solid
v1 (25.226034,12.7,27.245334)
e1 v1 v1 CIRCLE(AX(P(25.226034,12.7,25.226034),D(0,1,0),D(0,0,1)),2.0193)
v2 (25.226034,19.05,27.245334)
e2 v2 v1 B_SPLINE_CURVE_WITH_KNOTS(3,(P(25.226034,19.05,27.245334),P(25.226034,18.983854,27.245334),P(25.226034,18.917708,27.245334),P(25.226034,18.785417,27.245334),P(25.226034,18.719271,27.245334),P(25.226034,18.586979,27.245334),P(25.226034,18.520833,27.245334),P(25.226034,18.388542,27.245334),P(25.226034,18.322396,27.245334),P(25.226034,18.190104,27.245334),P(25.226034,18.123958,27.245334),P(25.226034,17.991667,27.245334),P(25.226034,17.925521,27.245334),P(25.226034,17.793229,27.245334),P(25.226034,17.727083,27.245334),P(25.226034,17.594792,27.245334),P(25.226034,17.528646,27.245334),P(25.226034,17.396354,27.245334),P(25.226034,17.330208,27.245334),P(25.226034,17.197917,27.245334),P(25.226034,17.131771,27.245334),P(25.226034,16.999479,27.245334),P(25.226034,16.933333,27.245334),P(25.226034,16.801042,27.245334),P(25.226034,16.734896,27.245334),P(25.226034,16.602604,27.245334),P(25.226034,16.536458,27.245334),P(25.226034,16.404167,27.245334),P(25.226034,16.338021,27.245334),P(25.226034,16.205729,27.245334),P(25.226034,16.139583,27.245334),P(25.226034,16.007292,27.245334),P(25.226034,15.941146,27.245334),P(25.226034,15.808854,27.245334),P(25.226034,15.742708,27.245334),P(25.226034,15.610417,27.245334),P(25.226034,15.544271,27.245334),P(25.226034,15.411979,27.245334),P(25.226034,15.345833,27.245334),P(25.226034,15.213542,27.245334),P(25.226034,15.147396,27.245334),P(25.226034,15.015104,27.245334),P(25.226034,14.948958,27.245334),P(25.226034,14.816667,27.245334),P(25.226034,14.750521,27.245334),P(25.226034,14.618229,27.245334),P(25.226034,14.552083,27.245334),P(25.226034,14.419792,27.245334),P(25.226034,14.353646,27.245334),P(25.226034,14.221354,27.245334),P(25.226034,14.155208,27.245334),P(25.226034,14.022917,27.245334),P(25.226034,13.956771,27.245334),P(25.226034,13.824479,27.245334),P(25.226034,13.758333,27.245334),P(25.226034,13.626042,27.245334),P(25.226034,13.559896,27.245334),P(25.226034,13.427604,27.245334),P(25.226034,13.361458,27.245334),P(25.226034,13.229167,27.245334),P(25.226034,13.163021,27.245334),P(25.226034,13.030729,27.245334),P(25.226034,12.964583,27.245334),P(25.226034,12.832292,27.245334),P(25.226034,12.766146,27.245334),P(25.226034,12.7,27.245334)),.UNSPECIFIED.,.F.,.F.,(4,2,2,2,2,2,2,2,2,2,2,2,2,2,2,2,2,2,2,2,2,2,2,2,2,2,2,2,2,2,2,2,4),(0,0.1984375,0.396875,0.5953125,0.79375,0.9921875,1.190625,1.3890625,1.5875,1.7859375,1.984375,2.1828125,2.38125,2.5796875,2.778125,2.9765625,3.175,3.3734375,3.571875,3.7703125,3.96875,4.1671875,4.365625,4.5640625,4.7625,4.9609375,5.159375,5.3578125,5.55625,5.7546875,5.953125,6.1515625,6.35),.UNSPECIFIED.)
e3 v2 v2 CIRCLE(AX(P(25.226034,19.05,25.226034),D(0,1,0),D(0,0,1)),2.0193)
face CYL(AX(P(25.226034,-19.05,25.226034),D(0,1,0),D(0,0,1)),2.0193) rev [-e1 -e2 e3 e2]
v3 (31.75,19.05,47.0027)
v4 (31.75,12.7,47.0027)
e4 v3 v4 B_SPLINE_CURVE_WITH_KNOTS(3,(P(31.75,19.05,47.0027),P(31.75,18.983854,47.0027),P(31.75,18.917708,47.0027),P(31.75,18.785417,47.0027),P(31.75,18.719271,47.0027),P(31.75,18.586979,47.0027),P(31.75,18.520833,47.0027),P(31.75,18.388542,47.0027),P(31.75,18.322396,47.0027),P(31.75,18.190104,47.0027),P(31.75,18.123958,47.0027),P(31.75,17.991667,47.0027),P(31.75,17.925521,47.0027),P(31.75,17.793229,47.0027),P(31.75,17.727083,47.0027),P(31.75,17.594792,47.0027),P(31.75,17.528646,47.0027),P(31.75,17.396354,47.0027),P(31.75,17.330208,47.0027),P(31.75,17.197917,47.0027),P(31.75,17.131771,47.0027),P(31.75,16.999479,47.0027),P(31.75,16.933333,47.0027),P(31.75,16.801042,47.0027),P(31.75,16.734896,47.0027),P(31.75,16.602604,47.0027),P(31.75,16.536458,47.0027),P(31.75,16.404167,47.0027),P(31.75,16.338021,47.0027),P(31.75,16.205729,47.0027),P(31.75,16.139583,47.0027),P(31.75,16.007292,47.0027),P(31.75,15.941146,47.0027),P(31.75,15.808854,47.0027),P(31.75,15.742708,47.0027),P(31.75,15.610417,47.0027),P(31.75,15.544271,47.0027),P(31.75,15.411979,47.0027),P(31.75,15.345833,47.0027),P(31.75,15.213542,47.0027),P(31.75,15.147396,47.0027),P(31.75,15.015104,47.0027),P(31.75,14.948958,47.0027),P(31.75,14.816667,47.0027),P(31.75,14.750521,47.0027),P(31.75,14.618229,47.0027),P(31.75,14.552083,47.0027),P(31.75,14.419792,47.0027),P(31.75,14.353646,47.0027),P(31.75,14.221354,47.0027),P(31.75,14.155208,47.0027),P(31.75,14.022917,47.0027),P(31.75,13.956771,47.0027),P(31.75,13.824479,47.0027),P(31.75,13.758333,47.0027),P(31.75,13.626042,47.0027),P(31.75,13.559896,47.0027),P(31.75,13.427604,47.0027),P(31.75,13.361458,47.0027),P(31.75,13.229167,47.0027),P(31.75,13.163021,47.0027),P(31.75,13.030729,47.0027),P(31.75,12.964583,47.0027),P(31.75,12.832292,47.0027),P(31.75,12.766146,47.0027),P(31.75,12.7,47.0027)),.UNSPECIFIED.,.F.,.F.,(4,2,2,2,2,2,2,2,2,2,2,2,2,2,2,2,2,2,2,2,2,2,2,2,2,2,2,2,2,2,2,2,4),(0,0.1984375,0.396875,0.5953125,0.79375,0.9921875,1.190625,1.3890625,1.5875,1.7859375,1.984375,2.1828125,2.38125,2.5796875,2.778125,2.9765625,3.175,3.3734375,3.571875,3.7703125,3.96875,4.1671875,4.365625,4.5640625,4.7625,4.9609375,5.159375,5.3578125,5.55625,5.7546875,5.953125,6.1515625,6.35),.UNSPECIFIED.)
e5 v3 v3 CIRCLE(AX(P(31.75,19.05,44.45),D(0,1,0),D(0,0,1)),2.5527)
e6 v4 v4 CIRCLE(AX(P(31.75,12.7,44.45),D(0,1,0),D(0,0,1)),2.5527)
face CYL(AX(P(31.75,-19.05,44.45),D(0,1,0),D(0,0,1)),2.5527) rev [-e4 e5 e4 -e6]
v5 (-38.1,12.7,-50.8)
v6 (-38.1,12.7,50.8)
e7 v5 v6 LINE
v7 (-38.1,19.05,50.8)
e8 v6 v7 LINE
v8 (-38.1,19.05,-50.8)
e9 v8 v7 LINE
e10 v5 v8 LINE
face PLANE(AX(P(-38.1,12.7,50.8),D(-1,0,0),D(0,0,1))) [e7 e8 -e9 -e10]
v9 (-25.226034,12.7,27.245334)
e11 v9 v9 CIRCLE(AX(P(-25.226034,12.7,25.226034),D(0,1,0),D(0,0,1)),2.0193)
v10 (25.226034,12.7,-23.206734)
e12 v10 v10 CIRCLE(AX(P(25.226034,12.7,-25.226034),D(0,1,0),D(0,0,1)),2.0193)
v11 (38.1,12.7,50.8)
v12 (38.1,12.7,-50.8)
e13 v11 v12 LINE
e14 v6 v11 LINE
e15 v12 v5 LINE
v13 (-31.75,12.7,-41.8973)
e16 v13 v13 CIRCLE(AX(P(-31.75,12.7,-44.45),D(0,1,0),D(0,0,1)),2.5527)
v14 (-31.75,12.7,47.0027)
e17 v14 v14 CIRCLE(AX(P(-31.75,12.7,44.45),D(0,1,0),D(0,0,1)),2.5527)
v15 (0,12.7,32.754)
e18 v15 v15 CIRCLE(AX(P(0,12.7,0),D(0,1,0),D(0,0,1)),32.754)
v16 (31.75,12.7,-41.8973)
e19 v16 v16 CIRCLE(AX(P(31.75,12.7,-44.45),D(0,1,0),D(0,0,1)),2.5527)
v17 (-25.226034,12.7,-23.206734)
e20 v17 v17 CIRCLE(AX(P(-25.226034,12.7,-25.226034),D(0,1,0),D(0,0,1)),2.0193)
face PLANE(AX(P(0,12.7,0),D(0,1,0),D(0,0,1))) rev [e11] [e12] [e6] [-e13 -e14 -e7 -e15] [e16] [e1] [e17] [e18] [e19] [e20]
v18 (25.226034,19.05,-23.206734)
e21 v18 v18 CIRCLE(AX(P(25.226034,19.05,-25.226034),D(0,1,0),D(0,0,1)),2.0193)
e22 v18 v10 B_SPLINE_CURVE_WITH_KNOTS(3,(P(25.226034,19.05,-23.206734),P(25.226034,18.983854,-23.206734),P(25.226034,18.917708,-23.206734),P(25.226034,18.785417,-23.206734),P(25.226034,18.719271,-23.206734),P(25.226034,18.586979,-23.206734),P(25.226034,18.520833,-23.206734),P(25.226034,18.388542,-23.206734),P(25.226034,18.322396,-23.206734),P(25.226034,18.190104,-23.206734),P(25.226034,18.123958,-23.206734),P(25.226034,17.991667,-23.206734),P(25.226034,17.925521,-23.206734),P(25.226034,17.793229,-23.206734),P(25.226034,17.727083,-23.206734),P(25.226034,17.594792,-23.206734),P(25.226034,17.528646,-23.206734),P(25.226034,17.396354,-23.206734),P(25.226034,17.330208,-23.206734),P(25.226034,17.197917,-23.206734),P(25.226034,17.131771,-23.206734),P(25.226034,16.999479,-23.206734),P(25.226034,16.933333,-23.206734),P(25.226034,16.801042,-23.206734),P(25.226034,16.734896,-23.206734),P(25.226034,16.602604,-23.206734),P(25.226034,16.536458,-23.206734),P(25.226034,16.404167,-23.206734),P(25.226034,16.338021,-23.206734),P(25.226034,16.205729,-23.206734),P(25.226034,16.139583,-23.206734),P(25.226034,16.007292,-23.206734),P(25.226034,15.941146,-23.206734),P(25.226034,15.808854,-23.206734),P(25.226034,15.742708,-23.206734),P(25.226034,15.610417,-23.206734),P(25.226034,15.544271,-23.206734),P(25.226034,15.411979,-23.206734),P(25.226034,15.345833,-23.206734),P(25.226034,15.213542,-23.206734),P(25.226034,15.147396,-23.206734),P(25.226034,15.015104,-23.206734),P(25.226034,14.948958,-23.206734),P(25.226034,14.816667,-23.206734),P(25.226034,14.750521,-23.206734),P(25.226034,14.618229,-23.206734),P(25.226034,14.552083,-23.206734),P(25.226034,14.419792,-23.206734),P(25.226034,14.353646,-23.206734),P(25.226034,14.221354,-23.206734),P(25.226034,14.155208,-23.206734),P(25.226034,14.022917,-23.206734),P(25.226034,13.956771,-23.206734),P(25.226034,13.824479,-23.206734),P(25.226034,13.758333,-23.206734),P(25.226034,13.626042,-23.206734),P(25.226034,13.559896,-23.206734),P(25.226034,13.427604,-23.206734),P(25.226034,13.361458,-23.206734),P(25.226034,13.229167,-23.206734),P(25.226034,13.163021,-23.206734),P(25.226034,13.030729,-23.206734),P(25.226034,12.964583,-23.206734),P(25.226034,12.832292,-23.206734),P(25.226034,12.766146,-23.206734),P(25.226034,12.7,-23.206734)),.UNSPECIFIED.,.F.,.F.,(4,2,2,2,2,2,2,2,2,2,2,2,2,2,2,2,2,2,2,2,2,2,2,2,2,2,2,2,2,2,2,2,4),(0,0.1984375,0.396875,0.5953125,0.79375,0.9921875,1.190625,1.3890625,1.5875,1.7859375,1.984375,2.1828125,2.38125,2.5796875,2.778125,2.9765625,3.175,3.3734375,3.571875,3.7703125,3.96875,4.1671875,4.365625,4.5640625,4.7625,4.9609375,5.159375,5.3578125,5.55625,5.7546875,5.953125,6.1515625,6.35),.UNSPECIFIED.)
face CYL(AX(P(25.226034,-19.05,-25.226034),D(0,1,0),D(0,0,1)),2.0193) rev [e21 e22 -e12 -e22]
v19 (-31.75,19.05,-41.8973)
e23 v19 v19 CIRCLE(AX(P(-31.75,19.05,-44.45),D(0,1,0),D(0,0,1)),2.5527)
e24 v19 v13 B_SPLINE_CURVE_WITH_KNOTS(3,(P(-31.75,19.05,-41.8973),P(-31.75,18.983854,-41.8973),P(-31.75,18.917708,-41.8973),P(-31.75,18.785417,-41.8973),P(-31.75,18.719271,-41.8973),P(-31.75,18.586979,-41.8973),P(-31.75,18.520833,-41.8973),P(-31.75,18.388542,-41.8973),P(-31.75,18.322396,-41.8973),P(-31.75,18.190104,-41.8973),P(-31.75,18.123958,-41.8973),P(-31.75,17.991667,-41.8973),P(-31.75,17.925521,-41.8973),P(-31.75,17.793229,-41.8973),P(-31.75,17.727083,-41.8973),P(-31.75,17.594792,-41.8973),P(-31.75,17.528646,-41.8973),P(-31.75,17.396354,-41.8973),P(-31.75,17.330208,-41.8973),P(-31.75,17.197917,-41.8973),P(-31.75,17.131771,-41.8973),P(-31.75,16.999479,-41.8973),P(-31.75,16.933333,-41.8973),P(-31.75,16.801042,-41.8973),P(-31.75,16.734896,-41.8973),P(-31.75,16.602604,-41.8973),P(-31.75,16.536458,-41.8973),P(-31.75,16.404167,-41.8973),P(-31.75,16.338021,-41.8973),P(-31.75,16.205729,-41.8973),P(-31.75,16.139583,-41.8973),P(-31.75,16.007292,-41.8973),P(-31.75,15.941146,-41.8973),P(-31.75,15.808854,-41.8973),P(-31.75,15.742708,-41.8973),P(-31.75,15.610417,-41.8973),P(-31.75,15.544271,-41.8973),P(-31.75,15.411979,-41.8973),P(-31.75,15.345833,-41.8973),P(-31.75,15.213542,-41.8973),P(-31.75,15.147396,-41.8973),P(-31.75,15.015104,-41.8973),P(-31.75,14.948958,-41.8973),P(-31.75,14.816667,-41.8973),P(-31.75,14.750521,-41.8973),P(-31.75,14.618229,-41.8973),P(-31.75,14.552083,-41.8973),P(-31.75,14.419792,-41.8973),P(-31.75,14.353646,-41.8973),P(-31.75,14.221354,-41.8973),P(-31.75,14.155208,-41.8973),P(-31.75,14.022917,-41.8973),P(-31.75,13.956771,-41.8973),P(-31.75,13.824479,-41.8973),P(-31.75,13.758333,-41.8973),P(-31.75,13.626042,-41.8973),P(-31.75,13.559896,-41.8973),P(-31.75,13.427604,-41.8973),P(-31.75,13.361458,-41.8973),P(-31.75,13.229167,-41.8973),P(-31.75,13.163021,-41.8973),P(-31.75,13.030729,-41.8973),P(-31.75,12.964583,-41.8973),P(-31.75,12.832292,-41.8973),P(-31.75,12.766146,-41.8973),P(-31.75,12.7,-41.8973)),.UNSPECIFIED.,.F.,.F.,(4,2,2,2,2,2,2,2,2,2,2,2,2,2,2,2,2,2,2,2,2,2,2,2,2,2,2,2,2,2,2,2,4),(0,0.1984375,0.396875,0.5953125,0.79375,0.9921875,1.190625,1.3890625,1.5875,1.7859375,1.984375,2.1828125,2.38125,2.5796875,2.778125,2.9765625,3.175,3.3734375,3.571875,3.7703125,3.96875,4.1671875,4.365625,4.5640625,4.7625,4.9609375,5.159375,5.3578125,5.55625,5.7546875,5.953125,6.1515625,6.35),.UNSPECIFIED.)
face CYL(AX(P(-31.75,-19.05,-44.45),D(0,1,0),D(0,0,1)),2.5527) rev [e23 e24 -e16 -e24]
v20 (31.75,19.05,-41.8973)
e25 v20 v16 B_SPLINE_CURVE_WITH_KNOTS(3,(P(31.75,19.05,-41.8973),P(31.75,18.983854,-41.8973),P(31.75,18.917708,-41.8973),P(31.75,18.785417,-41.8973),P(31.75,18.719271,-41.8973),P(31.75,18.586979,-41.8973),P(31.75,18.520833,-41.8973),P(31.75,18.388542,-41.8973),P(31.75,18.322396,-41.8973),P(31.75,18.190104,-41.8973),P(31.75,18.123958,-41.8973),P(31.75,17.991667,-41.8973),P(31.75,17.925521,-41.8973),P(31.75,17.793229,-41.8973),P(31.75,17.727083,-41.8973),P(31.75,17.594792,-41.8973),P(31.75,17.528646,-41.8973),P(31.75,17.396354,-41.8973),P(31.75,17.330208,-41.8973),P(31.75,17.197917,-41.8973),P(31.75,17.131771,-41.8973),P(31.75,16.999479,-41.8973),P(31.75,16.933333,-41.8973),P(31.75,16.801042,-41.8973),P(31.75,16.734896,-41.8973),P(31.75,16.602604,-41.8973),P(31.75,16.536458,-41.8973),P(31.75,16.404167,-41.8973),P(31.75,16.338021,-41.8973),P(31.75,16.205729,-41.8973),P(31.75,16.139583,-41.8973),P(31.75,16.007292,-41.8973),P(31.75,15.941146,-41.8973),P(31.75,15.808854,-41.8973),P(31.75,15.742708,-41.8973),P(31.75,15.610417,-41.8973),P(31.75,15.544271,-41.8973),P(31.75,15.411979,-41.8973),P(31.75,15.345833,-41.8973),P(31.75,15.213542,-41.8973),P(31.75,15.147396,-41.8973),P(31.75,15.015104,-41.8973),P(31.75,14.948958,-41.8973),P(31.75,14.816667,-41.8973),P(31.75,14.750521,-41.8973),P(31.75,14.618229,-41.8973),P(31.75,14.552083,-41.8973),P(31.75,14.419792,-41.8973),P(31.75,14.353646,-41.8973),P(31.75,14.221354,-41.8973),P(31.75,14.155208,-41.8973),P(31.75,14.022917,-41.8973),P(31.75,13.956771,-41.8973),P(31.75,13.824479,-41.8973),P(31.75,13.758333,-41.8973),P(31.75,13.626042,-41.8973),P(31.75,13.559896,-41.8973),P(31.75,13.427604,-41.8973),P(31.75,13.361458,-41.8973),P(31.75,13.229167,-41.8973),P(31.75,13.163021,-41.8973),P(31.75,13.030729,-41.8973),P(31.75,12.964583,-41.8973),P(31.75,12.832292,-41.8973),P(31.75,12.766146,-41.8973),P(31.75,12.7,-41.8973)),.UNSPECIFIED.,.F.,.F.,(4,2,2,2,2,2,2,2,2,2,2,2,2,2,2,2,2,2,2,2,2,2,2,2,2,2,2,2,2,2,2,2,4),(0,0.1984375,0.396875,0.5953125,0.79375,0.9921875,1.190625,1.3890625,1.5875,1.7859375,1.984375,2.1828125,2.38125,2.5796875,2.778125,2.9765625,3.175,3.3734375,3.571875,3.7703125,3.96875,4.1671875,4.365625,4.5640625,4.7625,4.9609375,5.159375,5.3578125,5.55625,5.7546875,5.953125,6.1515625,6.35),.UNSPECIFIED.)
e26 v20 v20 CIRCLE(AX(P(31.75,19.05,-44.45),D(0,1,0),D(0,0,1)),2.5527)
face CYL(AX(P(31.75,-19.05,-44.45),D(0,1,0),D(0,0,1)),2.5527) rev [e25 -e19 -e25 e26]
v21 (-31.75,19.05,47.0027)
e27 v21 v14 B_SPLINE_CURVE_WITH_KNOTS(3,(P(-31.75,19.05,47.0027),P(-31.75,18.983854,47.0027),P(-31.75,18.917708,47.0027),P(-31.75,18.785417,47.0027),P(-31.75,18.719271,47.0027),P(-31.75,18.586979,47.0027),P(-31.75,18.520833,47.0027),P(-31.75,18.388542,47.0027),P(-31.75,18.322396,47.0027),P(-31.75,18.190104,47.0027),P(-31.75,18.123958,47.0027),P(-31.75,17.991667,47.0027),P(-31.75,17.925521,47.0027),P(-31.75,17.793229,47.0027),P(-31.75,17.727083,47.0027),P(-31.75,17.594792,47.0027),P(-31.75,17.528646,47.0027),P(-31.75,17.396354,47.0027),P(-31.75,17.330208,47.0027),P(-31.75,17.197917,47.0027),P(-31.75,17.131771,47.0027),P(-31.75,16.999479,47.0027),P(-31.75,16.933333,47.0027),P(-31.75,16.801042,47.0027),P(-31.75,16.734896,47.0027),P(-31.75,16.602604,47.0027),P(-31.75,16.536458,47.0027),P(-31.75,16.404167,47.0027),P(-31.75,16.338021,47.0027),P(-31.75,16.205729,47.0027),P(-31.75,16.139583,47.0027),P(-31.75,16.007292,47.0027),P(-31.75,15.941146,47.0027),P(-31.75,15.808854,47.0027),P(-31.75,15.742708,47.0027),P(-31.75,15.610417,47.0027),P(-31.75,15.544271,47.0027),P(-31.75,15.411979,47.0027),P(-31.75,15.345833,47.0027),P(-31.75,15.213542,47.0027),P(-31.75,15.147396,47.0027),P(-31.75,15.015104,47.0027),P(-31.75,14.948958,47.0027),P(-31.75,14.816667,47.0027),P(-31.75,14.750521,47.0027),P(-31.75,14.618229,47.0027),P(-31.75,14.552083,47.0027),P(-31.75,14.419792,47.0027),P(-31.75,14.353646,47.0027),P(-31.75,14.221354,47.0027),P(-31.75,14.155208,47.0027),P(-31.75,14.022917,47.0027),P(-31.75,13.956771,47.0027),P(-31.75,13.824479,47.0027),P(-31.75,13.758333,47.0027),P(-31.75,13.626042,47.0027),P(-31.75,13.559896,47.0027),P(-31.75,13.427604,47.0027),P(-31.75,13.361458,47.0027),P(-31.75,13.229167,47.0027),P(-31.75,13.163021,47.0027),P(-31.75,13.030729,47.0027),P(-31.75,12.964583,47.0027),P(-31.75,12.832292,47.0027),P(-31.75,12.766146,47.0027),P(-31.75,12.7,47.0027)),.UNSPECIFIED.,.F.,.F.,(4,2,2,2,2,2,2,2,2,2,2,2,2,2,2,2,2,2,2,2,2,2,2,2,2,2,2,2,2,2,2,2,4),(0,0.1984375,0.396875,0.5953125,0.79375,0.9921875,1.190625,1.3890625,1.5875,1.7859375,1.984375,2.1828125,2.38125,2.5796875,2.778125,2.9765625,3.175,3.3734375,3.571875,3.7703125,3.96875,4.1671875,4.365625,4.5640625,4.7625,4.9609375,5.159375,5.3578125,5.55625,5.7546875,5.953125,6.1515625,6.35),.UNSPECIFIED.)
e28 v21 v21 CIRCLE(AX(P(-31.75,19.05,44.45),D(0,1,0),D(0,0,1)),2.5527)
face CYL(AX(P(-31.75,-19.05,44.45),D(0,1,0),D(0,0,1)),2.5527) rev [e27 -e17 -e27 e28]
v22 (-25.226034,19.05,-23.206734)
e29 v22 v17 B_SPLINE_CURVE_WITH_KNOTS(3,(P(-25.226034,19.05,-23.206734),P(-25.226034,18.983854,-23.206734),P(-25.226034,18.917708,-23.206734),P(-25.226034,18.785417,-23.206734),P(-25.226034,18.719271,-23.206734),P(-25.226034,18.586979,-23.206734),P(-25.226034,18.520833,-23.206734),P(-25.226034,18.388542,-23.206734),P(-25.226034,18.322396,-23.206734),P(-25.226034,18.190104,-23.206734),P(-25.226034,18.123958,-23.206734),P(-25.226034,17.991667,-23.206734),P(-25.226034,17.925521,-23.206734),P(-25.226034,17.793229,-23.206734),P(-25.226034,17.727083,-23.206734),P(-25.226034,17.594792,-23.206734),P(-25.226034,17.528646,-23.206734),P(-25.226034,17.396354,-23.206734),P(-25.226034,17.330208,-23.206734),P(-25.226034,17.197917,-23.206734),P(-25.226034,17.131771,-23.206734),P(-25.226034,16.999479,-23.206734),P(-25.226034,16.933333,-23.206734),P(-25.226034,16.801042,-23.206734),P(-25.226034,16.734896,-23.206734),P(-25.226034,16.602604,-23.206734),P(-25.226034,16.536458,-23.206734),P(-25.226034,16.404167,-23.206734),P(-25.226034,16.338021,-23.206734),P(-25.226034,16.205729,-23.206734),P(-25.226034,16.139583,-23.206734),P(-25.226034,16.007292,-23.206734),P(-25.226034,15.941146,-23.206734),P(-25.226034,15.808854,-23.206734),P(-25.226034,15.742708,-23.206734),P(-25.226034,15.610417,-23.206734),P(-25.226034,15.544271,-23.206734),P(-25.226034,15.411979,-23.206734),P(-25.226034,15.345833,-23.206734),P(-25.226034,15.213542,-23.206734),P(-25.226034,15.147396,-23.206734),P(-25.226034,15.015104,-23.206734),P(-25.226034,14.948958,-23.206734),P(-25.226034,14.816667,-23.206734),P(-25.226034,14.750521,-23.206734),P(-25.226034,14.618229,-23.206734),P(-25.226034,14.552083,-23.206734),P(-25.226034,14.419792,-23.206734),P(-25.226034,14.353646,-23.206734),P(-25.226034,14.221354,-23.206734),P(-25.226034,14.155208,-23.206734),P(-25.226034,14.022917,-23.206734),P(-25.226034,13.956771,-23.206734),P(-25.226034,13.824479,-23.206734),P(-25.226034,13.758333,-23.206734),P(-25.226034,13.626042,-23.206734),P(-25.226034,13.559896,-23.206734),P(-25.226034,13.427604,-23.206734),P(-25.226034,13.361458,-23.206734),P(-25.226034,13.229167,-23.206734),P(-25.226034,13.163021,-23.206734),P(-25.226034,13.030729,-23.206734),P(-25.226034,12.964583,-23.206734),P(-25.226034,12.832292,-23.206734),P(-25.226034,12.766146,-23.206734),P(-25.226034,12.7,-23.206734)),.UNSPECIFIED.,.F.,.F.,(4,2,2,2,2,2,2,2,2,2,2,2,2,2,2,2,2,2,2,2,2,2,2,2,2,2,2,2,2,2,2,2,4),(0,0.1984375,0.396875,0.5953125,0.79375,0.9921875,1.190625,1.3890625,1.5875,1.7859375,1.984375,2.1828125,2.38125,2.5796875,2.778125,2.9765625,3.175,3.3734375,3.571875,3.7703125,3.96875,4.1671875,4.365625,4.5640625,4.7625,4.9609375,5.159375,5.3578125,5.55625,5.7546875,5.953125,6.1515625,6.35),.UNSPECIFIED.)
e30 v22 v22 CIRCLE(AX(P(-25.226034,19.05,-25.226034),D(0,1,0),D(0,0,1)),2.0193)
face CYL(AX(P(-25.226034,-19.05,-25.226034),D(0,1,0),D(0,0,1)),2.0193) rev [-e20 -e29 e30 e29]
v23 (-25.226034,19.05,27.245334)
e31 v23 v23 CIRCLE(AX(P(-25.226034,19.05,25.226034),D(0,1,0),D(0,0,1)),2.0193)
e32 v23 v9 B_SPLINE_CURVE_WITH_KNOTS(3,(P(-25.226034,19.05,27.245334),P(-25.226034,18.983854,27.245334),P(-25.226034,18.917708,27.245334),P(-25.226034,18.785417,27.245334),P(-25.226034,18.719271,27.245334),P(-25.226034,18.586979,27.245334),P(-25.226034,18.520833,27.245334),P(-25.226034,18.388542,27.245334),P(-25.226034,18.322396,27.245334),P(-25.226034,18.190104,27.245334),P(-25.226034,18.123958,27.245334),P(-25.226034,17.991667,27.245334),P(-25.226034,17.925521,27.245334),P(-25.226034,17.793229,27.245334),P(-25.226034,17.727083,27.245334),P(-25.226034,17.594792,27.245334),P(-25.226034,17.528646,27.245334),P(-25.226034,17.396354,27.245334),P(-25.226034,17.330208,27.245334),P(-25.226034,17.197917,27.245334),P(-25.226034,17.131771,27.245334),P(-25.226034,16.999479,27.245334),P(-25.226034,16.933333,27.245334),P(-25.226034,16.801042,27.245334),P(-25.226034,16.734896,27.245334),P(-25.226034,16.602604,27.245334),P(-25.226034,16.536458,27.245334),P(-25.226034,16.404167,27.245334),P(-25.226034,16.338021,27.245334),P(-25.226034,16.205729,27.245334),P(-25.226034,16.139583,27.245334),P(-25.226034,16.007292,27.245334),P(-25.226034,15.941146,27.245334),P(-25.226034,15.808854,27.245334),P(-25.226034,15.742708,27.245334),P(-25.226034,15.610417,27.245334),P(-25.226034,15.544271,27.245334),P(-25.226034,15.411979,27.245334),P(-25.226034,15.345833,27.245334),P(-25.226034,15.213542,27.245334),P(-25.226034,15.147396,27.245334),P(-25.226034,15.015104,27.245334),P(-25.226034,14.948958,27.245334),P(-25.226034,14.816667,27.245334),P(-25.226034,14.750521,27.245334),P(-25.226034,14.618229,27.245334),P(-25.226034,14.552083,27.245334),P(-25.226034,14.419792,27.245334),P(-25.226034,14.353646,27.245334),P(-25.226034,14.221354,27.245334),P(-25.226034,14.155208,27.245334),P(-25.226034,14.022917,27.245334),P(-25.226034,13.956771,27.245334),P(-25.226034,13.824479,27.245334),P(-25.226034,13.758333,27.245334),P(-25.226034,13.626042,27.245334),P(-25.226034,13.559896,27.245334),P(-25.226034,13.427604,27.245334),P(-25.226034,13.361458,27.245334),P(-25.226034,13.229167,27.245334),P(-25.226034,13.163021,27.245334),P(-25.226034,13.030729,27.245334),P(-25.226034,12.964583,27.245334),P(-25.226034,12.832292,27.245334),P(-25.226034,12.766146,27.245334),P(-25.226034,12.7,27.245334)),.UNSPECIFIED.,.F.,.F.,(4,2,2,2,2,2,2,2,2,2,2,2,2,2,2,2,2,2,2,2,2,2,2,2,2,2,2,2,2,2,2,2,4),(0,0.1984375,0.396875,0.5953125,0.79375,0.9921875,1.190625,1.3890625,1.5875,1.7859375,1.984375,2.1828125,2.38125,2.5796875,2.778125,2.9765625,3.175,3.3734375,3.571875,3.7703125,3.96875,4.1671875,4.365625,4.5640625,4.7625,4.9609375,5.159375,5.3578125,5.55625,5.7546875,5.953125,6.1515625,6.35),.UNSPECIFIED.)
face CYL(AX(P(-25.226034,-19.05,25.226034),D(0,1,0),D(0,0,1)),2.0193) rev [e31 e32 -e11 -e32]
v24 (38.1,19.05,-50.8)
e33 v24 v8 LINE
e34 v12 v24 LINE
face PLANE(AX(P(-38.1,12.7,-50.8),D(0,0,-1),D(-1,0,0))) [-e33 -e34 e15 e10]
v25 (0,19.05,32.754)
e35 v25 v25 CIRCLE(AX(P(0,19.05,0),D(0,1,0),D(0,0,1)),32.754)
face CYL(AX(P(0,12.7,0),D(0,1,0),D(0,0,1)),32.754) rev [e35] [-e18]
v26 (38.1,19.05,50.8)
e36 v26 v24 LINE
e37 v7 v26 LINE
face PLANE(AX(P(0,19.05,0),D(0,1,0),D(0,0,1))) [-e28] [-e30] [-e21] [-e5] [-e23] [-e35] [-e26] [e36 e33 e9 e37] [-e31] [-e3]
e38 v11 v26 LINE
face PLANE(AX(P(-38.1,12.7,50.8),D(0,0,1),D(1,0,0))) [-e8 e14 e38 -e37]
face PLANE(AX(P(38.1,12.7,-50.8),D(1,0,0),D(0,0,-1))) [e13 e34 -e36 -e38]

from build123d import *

# Parameters (mm, degrees)
STOCK_GEARBOX_START                           = 12.7
STOCK_GEARBOX_WHEEL_PROTOTYPE_STRUCT_2_W      = 76.2
STOCK_GEARBOX_WHEEL_PROTOTYPE_STRUCT_2_H      = 101.6
STOCK_GEARBOX_WHEEL_PROTOTYPE_STRUCT_2_R      = 2.5527
STOCK_GEARBOX_WHEEL_PROTOTYPE_STRUCT_2_R_2    = 2.0193
STOCK_GEARBOX_WHEEL_PROTOTYPE_STRUCT_2_R_3    = 32.5
STOCK_GEARBOX_WHEEL_PROTOTYPE_STRUCTURE_DEPTH = 6.35
SKETCH1_R                                     = 32.754
CUT_EXTRUDE1_DEPTH                            = 64.816710194


# Read off the part's stored shape, not the designer's step: Stock-Gearbox Wheel Prototype Structure-1
with BuildPart() as part:
    # Stock-Gearbox Wheel Prototype Struct 2 → Stock-Gearbox Wheel Prototype Structure-1 (new body)
    with BuildSketch(Plane(origin=(0, 0, 0), x_dir=(1, 0, 0), z_dir=(0, 1, 0)).offset(STOCK_GEARBOX_START)):
        Rectangle(STOCK_GEARBOX_WHEEL_PROTOTYPE_STRUCT_2_W, STOCK_GEARBOX_WHEEL_PROTOTYPE_STRUCT_2_H)
        with Locations((-31.75, -44.45)):
            Circle(STOCK_GEARBOX_WHEEL_PROTOTYPE_STRUCT_2_R, mode=Mode.SUBTRACT)
        with Locations((-25.226034419, -25.226034419)):
            Circle(STOCK_GEARBOX_WHEEL_PROTOTYPE_STRUCT_2_R_2, mode=Mode.SUBTRACT)
        with Locations((31.75, -44.45)):
            Circle(STOCK_GEARBOX_WHEEL_PROTOTYPE_STRUCT_2_R, mode=Mode.SUBTRACT)
        Circle(STOCK_GEARBOX_WHEEL_PROTOTYPE_STRUCT_2_R_3, mode=Mode.SUBTRACT)
        with Locations((25.226034419, -25.226034419)):
            Circle(STOCK_GEARBOX_WHEEL_PROTOTYPE_STRUCT_2_R_2, mode=Mode.SUBTRACT)
        with Locations((-25.226034419, 25.226034419)):
            Circle(STOCK_GEARBOX_WHEEL_PROTOTYPE_STRUCT_2_R_2, mode=Mode.SUBTRACT)
        with Locations((-31.75, 44.45)):
            Circle(STOCK_GEARBOX_WHEEL_PROTOTYPE_STRUCT_2_R, mode=Mode.SUBTRACT)
        with Locations((25.226034419, 25.226034419)):
            Circle(STOCK_GEARBOX_WHEEL_PROTOTYPE_STRUCT_2_R_2, mode=Mode.SUBTRACT)
        with Locations((31.75, 44.45)):
            Circle(STOCK_GEARBOX_WHEEL_PROTOTYPE_STRUCT_2_R, mode=Mode.SUBTRACT)
    extrude(amount=STOCK_GEARBOX_WHEEL_PROTOTYPE_STRUCTURE_DEPTH)

    # Sketch1 → Cut-Extrude1 (cut, through all)
    with BuildSketch(Plane(origin=(0, 19.05, 0), x_dir=(1, 0, 0), z_dir=(0, 1, 0))):
        with Locations(Location((0, 0, 0), (0, 0, 270))):
            Circle(SKETCH1_R)
    extrude(amount=-CUT_EXTRUDE1_DEPTH, mode=Mode.SUBTRACT)


solid = part.part
